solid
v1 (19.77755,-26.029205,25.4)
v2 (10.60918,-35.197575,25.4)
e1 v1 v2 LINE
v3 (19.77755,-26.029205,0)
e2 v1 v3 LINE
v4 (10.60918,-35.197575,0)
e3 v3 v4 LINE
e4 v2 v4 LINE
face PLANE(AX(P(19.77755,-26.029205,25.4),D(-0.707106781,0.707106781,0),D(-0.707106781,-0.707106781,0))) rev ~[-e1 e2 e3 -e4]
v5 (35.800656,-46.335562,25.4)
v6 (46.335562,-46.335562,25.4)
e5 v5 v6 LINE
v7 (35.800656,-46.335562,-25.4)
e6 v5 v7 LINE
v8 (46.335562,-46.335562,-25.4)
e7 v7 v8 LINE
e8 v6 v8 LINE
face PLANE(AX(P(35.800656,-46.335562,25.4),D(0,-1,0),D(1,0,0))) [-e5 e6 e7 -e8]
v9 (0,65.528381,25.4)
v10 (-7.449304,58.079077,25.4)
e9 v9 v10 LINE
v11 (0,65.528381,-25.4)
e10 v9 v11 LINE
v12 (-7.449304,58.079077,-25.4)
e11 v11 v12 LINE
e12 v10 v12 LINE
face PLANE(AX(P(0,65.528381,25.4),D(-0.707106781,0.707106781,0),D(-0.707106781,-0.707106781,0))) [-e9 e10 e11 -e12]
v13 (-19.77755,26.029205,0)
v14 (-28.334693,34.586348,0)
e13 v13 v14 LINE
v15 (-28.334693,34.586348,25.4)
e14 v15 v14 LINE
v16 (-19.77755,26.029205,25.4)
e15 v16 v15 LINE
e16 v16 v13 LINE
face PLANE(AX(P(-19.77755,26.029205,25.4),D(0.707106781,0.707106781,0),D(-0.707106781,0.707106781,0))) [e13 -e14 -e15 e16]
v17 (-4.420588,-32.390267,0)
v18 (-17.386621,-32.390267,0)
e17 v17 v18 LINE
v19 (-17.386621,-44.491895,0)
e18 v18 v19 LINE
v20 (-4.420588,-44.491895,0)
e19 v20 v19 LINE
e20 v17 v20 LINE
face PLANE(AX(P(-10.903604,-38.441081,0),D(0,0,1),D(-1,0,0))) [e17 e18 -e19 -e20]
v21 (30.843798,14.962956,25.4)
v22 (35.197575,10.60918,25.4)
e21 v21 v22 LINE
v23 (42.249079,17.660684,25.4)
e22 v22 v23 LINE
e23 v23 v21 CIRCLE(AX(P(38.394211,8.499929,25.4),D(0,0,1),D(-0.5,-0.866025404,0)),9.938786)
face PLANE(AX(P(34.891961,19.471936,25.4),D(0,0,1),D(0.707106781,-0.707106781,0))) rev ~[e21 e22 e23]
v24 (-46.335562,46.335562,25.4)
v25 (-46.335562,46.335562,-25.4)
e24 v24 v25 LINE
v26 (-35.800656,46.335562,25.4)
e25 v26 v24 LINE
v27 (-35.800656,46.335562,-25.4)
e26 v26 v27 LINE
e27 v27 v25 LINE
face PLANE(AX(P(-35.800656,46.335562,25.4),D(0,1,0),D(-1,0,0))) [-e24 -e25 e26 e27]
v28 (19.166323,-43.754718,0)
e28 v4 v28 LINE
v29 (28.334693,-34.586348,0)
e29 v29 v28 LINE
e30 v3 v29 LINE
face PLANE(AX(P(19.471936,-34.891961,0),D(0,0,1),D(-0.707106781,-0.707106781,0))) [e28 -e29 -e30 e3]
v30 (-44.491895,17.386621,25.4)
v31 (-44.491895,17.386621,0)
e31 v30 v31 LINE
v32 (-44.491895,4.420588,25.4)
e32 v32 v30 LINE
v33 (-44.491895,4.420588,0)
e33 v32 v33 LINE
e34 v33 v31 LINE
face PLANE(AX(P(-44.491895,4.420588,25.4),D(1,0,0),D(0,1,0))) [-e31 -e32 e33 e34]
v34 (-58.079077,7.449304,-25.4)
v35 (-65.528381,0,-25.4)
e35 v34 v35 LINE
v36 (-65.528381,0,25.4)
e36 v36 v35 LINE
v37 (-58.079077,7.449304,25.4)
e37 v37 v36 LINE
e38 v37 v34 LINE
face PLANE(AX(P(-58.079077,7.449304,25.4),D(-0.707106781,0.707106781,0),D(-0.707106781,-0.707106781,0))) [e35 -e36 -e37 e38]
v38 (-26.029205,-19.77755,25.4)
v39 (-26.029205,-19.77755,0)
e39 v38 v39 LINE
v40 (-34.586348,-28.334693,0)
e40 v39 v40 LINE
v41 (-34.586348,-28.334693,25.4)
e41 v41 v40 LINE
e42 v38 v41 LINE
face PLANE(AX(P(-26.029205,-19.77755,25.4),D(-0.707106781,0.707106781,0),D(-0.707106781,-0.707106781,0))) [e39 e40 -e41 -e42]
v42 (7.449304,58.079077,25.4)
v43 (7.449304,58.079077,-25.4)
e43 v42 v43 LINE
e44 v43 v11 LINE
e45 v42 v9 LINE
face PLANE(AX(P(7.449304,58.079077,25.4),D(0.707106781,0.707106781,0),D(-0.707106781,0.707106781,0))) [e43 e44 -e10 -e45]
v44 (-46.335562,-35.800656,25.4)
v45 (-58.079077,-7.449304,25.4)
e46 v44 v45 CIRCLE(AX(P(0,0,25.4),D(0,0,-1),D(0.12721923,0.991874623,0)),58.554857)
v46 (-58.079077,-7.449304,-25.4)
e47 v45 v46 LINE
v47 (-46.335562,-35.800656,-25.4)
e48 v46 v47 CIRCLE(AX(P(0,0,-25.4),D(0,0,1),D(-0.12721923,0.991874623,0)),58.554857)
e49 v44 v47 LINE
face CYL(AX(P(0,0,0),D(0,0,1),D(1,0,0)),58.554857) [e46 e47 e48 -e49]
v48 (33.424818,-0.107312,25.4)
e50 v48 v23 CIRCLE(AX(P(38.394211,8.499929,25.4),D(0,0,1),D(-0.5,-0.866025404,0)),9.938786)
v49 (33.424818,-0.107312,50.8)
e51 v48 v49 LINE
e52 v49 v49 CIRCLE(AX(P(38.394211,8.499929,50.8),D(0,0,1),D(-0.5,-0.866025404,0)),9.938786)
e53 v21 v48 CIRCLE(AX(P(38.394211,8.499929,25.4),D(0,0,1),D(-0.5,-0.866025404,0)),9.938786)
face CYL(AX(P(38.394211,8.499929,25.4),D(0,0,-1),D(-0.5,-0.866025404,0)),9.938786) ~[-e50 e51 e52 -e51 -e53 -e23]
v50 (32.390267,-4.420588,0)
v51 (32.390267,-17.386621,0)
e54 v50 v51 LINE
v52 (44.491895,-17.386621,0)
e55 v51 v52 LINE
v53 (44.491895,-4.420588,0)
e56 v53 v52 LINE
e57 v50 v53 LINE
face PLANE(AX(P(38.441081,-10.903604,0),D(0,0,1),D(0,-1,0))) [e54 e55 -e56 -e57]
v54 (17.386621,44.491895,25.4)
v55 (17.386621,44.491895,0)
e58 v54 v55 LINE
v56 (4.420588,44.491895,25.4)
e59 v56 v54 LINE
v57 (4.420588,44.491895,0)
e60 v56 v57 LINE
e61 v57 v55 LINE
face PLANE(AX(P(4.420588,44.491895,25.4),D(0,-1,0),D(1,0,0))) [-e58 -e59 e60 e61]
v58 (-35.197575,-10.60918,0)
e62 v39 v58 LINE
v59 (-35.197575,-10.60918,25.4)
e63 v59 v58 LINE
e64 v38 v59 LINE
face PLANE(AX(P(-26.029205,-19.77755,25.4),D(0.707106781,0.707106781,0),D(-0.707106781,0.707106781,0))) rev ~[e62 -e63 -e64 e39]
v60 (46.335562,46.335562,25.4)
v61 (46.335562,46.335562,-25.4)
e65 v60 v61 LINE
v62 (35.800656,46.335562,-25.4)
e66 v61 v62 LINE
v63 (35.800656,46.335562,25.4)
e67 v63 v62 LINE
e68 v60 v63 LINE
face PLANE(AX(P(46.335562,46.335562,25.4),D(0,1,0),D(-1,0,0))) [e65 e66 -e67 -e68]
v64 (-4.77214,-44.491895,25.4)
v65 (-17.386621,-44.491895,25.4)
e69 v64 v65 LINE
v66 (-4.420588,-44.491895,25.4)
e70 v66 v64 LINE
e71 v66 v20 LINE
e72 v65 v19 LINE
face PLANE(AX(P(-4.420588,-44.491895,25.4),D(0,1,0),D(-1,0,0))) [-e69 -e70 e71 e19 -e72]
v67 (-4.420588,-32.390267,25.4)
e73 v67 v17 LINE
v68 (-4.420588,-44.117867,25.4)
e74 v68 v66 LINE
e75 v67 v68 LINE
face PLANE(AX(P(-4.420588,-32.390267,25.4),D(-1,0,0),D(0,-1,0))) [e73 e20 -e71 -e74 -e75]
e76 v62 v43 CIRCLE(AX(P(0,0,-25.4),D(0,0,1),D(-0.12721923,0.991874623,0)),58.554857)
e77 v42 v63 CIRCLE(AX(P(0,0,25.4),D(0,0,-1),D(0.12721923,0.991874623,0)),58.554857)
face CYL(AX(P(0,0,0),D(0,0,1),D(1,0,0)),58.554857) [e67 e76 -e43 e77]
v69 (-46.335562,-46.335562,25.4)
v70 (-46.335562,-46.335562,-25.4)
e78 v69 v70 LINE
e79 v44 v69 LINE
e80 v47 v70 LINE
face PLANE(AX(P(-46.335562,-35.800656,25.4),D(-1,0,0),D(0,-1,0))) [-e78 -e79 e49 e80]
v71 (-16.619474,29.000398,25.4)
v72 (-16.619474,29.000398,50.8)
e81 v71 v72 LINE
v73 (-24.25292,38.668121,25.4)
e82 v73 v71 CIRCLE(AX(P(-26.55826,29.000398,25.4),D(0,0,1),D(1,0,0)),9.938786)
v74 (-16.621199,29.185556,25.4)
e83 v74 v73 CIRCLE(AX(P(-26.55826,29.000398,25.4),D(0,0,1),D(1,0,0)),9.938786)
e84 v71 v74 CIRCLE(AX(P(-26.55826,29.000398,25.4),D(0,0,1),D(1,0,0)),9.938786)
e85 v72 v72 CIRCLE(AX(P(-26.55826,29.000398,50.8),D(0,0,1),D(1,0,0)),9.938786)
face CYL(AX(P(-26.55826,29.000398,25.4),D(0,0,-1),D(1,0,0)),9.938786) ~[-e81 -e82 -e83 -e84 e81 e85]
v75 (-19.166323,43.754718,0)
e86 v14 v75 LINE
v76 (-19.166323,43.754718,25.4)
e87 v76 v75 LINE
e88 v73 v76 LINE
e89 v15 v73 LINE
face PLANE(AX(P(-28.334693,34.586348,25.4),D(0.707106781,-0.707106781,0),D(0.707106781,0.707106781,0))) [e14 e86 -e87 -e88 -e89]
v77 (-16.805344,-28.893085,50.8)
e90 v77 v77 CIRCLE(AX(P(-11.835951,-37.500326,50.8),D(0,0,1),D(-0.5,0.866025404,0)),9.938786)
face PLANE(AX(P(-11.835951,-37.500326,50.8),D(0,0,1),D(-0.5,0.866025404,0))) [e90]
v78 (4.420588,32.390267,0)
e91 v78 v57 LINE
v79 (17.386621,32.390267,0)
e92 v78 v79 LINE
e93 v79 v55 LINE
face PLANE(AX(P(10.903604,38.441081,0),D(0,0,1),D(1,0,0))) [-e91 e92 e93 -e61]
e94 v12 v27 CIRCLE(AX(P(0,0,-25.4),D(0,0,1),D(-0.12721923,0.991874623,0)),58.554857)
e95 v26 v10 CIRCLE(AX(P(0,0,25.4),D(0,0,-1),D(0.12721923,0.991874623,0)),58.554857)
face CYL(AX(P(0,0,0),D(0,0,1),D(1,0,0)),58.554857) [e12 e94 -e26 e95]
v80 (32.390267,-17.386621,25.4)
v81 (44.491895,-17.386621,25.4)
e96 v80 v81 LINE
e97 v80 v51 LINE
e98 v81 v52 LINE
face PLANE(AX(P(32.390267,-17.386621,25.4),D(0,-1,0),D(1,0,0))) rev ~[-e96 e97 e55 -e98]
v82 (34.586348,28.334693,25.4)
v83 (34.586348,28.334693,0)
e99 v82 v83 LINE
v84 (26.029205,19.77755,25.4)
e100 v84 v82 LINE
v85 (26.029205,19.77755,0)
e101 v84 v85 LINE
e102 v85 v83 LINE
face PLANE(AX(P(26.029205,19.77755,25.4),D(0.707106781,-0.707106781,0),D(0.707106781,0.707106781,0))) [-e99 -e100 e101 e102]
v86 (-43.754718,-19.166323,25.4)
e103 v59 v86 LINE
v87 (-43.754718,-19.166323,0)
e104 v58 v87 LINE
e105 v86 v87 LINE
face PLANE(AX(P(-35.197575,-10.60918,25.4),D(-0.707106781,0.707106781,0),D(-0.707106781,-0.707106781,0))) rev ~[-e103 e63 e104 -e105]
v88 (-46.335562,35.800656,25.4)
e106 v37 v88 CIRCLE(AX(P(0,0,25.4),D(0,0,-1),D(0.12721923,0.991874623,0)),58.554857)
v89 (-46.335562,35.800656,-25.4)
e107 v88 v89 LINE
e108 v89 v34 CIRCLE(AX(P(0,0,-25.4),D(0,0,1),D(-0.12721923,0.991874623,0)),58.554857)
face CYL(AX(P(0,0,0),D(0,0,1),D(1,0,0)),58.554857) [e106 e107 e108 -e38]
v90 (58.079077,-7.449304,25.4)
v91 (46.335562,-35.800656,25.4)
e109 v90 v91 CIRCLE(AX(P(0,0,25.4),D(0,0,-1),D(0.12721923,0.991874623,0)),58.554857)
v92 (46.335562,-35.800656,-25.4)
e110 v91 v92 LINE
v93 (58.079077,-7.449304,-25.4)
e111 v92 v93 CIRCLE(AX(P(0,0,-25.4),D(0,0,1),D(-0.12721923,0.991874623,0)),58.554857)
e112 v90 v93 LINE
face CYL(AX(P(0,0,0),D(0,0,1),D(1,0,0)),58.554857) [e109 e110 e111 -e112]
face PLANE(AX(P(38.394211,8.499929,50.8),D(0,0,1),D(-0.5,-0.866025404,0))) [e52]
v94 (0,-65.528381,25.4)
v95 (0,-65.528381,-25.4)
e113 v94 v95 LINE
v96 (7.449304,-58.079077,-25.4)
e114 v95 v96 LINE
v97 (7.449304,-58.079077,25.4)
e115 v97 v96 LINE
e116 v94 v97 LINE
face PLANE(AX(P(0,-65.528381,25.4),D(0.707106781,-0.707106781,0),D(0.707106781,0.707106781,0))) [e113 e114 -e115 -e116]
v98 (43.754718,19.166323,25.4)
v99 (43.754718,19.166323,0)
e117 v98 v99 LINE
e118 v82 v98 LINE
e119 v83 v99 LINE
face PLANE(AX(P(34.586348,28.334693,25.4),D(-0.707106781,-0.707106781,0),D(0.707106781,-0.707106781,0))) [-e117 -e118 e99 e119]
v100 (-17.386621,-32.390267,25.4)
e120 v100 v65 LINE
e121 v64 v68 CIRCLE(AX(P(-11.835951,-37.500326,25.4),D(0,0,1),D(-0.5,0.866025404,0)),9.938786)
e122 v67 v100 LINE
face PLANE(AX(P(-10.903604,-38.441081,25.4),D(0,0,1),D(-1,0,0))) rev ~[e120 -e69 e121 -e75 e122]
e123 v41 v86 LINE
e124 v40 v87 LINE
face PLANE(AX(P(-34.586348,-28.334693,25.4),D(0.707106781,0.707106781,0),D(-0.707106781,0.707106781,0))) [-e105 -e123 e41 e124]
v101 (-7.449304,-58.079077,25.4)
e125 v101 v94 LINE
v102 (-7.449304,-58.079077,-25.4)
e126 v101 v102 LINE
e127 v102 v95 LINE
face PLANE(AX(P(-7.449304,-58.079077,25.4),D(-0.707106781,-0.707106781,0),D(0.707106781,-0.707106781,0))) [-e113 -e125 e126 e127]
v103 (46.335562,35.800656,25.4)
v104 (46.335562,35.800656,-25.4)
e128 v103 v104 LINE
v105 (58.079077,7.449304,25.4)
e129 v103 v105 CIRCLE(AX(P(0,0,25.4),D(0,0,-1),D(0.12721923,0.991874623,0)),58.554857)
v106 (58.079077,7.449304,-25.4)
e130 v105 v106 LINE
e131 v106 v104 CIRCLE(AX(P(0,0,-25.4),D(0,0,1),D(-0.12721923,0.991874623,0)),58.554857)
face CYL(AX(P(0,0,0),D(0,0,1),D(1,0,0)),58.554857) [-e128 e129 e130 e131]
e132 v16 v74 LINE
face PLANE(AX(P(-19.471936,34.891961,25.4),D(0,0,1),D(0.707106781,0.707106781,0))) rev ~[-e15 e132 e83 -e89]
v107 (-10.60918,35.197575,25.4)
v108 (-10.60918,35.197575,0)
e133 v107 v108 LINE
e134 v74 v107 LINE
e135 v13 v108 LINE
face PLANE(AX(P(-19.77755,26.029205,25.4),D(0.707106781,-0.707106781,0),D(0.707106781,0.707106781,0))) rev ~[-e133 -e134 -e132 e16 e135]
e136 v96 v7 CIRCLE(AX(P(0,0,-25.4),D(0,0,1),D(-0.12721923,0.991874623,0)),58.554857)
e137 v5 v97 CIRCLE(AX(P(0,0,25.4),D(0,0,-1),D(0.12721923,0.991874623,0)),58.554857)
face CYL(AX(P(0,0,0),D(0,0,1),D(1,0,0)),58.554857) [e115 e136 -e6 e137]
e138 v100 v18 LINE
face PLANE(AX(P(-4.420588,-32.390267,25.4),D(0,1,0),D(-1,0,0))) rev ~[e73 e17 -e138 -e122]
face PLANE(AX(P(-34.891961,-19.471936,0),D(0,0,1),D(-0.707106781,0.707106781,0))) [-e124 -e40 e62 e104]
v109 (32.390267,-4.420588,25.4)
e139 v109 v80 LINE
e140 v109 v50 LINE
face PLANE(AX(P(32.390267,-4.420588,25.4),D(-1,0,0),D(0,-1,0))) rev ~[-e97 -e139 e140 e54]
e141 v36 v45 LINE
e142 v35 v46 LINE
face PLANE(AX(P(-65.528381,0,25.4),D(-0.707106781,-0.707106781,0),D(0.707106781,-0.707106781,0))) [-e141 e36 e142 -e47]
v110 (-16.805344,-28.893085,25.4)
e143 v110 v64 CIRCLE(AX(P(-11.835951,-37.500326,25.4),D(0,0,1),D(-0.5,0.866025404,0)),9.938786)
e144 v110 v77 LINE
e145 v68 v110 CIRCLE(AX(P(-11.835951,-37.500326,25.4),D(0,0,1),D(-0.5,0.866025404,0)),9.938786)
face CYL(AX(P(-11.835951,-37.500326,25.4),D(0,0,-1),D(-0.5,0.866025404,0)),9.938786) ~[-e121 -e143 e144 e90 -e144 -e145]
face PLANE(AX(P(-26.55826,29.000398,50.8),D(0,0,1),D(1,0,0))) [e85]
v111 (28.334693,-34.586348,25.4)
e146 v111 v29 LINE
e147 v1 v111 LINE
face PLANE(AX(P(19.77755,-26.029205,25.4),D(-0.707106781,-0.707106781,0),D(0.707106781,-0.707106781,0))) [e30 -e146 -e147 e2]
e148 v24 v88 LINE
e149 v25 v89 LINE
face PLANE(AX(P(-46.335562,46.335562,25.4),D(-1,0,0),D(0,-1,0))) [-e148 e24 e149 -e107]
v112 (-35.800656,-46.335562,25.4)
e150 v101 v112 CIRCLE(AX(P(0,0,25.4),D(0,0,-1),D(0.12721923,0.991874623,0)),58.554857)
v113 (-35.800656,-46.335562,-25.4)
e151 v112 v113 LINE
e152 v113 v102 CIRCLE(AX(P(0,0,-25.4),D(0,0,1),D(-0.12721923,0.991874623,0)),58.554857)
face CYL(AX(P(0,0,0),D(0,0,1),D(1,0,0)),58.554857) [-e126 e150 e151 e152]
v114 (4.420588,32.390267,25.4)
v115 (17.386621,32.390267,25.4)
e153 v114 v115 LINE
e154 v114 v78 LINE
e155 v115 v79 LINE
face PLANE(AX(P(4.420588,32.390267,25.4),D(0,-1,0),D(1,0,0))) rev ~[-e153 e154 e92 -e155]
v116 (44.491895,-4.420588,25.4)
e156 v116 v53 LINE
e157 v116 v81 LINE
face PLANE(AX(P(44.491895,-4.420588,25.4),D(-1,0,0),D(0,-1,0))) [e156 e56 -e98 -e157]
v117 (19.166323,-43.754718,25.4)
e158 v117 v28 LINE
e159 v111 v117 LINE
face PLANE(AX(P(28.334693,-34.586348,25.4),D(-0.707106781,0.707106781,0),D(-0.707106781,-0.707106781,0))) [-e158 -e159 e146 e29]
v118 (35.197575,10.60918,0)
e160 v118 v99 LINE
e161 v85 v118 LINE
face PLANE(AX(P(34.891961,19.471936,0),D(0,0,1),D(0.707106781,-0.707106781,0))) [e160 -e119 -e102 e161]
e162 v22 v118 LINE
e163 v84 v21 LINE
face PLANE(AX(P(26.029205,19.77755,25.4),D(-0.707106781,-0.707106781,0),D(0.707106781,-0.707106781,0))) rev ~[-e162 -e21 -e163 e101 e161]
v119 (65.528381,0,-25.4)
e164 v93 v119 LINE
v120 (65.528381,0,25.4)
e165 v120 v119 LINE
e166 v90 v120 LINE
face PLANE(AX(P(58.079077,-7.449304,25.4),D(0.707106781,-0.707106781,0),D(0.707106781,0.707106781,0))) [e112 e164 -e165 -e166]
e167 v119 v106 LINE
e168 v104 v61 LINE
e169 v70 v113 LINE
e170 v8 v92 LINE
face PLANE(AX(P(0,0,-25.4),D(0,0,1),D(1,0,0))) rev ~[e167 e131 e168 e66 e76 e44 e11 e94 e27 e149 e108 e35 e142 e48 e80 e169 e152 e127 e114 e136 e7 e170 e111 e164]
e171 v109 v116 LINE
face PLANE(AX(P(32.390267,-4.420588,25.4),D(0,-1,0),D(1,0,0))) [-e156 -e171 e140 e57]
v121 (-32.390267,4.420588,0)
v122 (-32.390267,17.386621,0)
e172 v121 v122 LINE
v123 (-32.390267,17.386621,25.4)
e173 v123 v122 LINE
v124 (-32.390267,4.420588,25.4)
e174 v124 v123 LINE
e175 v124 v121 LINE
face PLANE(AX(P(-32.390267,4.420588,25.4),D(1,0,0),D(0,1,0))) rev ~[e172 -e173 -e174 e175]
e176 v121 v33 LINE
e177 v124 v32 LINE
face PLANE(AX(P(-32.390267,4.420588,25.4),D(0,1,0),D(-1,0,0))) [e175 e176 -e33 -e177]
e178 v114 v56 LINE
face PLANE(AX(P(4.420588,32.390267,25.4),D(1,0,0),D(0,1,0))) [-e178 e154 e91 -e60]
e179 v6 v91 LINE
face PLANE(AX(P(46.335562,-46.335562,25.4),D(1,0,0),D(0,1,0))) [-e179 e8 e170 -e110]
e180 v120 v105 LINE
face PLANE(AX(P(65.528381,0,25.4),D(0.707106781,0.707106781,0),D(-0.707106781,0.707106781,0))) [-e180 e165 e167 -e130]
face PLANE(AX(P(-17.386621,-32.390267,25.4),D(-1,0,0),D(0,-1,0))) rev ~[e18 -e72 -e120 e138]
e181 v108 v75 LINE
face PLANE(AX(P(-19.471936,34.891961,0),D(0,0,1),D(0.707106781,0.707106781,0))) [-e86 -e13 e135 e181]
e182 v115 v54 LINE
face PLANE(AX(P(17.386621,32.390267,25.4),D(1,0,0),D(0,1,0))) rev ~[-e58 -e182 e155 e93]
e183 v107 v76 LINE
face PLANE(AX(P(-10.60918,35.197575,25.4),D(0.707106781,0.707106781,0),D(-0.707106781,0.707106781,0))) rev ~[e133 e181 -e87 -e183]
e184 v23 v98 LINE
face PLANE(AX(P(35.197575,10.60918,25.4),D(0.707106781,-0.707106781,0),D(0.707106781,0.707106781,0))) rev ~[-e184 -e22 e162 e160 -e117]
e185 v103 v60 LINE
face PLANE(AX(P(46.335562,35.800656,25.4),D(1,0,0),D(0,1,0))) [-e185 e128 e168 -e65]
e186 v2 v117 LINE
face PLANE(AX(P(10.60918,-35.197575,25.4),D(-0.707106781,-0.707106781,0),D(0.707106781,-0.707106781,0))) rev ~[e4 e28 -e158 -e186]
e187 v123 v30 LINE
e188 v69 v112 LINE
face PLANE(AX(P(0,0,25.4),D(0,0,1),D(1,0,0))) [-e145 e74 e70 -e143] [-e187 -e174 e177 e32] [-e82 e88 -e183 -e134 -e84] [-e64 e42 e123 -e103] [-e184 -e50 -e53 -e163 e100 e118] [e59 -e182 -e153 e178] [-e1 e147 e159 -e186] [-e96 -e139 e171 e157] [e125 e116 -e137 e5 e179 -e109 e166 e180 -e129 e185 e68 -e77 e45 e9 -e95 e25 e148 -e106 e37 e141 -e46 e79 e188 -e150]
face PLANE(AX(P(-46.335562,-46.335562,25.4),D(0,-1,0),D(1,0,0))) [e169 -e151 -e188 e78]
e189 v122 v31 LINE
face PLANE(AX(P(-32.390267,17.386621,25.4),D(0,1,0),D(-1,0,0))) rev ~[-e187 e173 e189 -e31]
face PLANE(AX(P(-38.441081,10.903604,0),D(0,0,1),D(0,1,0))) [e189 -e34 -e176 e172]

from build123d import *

# Parameters (mm, degrees)
F0_R            = 58.5548573359
F1_DEPTH        = 25.4
F2_R            = 9.9387856365
F3_DEPTH        = 25.4
F3_COPIES_COUNT = 3
F5_DEPTH        = 50.8
F5_COPIES_COUNT = 8
F6_W            = 12.9660330713
F6_H            = 12.1016278863
F7_DEPTH        = 25.4
F7_COPIES_COUNT = 8


# Not quite as in the source:
# - a pattern or mirror of a feature is missing from the dataset's text; its kind, count and spacing are read off the source's solid


with BuildPart() as f1:
    # F0 (on Top) → F1 (new body, symmetric)
    with BuildSketch(Plane.XY):
        Circle(F0_R)
    extrude(amount=F1_DEPTH, both=True)

    # F2 (on face) → F3 (join)
    with BuildSketch(Plane.XY.offset(25.4)):
        with Locations((-26.5582595021, 29.0003977716)):
            Circle(F2_R)
    f3 = extrude(amount=F3_DEPTH)

    # F3_copies: F3 ×3 about axis
    f3_copies_axis = Axis((0, 0, 0), (0, 0, 1))
    for i in range(1, F3_COPIES_COUNT):
        add(f3.rotate(f3_copies_axis, i * 360 / F3_COPIES_COUNT))

    # F4 (on face) → F5 (join, through all)
    with BuildSketch(Plane.XY.offset(25.4)):
        with BuildLine():
            Line((0, 65.528380896), (-7.4493038573, 58.0790770387))
            ThreePointArc((-7.4493038573, 58.0790770387), (0, 58.5548573359), (7.4493038573, 58.0790770387))
            Line((7.4493038573, 58.0790770387), (0, 65.528380896))
        make_face()
    f5 = extrude(amount=-F5_DEPTH)

    # F5_copies: F5 ×8 about axis
    f5_copies_axis = Axis((0, 0, 0), (0, 0, 1))
    for i in range(1, F5_COPIES_COUNT):
        add(f5.rotate(f5_copies_axis, i * 360 / F5_COPIES_COUNT))

    # F6 (on face) → F7 (cut)
    with BuildSketch(Plane.XY.offset(25.4)):
        with Locations((10.9036043286, 38.4410806)):
            Rectangle(F6_W, F6_H)
    f7 = extrude(amount=-F7_DEPTH, mode=Mode.SUBTRACT)

    # F7_copies: F7 ×8 about axis
    f7_copies_axis = Axis((0, 0, 0), (0, 0, 1))
    for i in range(1, F7_COPIES_COUNT):
        add(f7.rotate(f7_copies_axis, i * 360 / F7_COPIES_COUNT), mode=Mode.SUBTRACT)


solid = f1.part
